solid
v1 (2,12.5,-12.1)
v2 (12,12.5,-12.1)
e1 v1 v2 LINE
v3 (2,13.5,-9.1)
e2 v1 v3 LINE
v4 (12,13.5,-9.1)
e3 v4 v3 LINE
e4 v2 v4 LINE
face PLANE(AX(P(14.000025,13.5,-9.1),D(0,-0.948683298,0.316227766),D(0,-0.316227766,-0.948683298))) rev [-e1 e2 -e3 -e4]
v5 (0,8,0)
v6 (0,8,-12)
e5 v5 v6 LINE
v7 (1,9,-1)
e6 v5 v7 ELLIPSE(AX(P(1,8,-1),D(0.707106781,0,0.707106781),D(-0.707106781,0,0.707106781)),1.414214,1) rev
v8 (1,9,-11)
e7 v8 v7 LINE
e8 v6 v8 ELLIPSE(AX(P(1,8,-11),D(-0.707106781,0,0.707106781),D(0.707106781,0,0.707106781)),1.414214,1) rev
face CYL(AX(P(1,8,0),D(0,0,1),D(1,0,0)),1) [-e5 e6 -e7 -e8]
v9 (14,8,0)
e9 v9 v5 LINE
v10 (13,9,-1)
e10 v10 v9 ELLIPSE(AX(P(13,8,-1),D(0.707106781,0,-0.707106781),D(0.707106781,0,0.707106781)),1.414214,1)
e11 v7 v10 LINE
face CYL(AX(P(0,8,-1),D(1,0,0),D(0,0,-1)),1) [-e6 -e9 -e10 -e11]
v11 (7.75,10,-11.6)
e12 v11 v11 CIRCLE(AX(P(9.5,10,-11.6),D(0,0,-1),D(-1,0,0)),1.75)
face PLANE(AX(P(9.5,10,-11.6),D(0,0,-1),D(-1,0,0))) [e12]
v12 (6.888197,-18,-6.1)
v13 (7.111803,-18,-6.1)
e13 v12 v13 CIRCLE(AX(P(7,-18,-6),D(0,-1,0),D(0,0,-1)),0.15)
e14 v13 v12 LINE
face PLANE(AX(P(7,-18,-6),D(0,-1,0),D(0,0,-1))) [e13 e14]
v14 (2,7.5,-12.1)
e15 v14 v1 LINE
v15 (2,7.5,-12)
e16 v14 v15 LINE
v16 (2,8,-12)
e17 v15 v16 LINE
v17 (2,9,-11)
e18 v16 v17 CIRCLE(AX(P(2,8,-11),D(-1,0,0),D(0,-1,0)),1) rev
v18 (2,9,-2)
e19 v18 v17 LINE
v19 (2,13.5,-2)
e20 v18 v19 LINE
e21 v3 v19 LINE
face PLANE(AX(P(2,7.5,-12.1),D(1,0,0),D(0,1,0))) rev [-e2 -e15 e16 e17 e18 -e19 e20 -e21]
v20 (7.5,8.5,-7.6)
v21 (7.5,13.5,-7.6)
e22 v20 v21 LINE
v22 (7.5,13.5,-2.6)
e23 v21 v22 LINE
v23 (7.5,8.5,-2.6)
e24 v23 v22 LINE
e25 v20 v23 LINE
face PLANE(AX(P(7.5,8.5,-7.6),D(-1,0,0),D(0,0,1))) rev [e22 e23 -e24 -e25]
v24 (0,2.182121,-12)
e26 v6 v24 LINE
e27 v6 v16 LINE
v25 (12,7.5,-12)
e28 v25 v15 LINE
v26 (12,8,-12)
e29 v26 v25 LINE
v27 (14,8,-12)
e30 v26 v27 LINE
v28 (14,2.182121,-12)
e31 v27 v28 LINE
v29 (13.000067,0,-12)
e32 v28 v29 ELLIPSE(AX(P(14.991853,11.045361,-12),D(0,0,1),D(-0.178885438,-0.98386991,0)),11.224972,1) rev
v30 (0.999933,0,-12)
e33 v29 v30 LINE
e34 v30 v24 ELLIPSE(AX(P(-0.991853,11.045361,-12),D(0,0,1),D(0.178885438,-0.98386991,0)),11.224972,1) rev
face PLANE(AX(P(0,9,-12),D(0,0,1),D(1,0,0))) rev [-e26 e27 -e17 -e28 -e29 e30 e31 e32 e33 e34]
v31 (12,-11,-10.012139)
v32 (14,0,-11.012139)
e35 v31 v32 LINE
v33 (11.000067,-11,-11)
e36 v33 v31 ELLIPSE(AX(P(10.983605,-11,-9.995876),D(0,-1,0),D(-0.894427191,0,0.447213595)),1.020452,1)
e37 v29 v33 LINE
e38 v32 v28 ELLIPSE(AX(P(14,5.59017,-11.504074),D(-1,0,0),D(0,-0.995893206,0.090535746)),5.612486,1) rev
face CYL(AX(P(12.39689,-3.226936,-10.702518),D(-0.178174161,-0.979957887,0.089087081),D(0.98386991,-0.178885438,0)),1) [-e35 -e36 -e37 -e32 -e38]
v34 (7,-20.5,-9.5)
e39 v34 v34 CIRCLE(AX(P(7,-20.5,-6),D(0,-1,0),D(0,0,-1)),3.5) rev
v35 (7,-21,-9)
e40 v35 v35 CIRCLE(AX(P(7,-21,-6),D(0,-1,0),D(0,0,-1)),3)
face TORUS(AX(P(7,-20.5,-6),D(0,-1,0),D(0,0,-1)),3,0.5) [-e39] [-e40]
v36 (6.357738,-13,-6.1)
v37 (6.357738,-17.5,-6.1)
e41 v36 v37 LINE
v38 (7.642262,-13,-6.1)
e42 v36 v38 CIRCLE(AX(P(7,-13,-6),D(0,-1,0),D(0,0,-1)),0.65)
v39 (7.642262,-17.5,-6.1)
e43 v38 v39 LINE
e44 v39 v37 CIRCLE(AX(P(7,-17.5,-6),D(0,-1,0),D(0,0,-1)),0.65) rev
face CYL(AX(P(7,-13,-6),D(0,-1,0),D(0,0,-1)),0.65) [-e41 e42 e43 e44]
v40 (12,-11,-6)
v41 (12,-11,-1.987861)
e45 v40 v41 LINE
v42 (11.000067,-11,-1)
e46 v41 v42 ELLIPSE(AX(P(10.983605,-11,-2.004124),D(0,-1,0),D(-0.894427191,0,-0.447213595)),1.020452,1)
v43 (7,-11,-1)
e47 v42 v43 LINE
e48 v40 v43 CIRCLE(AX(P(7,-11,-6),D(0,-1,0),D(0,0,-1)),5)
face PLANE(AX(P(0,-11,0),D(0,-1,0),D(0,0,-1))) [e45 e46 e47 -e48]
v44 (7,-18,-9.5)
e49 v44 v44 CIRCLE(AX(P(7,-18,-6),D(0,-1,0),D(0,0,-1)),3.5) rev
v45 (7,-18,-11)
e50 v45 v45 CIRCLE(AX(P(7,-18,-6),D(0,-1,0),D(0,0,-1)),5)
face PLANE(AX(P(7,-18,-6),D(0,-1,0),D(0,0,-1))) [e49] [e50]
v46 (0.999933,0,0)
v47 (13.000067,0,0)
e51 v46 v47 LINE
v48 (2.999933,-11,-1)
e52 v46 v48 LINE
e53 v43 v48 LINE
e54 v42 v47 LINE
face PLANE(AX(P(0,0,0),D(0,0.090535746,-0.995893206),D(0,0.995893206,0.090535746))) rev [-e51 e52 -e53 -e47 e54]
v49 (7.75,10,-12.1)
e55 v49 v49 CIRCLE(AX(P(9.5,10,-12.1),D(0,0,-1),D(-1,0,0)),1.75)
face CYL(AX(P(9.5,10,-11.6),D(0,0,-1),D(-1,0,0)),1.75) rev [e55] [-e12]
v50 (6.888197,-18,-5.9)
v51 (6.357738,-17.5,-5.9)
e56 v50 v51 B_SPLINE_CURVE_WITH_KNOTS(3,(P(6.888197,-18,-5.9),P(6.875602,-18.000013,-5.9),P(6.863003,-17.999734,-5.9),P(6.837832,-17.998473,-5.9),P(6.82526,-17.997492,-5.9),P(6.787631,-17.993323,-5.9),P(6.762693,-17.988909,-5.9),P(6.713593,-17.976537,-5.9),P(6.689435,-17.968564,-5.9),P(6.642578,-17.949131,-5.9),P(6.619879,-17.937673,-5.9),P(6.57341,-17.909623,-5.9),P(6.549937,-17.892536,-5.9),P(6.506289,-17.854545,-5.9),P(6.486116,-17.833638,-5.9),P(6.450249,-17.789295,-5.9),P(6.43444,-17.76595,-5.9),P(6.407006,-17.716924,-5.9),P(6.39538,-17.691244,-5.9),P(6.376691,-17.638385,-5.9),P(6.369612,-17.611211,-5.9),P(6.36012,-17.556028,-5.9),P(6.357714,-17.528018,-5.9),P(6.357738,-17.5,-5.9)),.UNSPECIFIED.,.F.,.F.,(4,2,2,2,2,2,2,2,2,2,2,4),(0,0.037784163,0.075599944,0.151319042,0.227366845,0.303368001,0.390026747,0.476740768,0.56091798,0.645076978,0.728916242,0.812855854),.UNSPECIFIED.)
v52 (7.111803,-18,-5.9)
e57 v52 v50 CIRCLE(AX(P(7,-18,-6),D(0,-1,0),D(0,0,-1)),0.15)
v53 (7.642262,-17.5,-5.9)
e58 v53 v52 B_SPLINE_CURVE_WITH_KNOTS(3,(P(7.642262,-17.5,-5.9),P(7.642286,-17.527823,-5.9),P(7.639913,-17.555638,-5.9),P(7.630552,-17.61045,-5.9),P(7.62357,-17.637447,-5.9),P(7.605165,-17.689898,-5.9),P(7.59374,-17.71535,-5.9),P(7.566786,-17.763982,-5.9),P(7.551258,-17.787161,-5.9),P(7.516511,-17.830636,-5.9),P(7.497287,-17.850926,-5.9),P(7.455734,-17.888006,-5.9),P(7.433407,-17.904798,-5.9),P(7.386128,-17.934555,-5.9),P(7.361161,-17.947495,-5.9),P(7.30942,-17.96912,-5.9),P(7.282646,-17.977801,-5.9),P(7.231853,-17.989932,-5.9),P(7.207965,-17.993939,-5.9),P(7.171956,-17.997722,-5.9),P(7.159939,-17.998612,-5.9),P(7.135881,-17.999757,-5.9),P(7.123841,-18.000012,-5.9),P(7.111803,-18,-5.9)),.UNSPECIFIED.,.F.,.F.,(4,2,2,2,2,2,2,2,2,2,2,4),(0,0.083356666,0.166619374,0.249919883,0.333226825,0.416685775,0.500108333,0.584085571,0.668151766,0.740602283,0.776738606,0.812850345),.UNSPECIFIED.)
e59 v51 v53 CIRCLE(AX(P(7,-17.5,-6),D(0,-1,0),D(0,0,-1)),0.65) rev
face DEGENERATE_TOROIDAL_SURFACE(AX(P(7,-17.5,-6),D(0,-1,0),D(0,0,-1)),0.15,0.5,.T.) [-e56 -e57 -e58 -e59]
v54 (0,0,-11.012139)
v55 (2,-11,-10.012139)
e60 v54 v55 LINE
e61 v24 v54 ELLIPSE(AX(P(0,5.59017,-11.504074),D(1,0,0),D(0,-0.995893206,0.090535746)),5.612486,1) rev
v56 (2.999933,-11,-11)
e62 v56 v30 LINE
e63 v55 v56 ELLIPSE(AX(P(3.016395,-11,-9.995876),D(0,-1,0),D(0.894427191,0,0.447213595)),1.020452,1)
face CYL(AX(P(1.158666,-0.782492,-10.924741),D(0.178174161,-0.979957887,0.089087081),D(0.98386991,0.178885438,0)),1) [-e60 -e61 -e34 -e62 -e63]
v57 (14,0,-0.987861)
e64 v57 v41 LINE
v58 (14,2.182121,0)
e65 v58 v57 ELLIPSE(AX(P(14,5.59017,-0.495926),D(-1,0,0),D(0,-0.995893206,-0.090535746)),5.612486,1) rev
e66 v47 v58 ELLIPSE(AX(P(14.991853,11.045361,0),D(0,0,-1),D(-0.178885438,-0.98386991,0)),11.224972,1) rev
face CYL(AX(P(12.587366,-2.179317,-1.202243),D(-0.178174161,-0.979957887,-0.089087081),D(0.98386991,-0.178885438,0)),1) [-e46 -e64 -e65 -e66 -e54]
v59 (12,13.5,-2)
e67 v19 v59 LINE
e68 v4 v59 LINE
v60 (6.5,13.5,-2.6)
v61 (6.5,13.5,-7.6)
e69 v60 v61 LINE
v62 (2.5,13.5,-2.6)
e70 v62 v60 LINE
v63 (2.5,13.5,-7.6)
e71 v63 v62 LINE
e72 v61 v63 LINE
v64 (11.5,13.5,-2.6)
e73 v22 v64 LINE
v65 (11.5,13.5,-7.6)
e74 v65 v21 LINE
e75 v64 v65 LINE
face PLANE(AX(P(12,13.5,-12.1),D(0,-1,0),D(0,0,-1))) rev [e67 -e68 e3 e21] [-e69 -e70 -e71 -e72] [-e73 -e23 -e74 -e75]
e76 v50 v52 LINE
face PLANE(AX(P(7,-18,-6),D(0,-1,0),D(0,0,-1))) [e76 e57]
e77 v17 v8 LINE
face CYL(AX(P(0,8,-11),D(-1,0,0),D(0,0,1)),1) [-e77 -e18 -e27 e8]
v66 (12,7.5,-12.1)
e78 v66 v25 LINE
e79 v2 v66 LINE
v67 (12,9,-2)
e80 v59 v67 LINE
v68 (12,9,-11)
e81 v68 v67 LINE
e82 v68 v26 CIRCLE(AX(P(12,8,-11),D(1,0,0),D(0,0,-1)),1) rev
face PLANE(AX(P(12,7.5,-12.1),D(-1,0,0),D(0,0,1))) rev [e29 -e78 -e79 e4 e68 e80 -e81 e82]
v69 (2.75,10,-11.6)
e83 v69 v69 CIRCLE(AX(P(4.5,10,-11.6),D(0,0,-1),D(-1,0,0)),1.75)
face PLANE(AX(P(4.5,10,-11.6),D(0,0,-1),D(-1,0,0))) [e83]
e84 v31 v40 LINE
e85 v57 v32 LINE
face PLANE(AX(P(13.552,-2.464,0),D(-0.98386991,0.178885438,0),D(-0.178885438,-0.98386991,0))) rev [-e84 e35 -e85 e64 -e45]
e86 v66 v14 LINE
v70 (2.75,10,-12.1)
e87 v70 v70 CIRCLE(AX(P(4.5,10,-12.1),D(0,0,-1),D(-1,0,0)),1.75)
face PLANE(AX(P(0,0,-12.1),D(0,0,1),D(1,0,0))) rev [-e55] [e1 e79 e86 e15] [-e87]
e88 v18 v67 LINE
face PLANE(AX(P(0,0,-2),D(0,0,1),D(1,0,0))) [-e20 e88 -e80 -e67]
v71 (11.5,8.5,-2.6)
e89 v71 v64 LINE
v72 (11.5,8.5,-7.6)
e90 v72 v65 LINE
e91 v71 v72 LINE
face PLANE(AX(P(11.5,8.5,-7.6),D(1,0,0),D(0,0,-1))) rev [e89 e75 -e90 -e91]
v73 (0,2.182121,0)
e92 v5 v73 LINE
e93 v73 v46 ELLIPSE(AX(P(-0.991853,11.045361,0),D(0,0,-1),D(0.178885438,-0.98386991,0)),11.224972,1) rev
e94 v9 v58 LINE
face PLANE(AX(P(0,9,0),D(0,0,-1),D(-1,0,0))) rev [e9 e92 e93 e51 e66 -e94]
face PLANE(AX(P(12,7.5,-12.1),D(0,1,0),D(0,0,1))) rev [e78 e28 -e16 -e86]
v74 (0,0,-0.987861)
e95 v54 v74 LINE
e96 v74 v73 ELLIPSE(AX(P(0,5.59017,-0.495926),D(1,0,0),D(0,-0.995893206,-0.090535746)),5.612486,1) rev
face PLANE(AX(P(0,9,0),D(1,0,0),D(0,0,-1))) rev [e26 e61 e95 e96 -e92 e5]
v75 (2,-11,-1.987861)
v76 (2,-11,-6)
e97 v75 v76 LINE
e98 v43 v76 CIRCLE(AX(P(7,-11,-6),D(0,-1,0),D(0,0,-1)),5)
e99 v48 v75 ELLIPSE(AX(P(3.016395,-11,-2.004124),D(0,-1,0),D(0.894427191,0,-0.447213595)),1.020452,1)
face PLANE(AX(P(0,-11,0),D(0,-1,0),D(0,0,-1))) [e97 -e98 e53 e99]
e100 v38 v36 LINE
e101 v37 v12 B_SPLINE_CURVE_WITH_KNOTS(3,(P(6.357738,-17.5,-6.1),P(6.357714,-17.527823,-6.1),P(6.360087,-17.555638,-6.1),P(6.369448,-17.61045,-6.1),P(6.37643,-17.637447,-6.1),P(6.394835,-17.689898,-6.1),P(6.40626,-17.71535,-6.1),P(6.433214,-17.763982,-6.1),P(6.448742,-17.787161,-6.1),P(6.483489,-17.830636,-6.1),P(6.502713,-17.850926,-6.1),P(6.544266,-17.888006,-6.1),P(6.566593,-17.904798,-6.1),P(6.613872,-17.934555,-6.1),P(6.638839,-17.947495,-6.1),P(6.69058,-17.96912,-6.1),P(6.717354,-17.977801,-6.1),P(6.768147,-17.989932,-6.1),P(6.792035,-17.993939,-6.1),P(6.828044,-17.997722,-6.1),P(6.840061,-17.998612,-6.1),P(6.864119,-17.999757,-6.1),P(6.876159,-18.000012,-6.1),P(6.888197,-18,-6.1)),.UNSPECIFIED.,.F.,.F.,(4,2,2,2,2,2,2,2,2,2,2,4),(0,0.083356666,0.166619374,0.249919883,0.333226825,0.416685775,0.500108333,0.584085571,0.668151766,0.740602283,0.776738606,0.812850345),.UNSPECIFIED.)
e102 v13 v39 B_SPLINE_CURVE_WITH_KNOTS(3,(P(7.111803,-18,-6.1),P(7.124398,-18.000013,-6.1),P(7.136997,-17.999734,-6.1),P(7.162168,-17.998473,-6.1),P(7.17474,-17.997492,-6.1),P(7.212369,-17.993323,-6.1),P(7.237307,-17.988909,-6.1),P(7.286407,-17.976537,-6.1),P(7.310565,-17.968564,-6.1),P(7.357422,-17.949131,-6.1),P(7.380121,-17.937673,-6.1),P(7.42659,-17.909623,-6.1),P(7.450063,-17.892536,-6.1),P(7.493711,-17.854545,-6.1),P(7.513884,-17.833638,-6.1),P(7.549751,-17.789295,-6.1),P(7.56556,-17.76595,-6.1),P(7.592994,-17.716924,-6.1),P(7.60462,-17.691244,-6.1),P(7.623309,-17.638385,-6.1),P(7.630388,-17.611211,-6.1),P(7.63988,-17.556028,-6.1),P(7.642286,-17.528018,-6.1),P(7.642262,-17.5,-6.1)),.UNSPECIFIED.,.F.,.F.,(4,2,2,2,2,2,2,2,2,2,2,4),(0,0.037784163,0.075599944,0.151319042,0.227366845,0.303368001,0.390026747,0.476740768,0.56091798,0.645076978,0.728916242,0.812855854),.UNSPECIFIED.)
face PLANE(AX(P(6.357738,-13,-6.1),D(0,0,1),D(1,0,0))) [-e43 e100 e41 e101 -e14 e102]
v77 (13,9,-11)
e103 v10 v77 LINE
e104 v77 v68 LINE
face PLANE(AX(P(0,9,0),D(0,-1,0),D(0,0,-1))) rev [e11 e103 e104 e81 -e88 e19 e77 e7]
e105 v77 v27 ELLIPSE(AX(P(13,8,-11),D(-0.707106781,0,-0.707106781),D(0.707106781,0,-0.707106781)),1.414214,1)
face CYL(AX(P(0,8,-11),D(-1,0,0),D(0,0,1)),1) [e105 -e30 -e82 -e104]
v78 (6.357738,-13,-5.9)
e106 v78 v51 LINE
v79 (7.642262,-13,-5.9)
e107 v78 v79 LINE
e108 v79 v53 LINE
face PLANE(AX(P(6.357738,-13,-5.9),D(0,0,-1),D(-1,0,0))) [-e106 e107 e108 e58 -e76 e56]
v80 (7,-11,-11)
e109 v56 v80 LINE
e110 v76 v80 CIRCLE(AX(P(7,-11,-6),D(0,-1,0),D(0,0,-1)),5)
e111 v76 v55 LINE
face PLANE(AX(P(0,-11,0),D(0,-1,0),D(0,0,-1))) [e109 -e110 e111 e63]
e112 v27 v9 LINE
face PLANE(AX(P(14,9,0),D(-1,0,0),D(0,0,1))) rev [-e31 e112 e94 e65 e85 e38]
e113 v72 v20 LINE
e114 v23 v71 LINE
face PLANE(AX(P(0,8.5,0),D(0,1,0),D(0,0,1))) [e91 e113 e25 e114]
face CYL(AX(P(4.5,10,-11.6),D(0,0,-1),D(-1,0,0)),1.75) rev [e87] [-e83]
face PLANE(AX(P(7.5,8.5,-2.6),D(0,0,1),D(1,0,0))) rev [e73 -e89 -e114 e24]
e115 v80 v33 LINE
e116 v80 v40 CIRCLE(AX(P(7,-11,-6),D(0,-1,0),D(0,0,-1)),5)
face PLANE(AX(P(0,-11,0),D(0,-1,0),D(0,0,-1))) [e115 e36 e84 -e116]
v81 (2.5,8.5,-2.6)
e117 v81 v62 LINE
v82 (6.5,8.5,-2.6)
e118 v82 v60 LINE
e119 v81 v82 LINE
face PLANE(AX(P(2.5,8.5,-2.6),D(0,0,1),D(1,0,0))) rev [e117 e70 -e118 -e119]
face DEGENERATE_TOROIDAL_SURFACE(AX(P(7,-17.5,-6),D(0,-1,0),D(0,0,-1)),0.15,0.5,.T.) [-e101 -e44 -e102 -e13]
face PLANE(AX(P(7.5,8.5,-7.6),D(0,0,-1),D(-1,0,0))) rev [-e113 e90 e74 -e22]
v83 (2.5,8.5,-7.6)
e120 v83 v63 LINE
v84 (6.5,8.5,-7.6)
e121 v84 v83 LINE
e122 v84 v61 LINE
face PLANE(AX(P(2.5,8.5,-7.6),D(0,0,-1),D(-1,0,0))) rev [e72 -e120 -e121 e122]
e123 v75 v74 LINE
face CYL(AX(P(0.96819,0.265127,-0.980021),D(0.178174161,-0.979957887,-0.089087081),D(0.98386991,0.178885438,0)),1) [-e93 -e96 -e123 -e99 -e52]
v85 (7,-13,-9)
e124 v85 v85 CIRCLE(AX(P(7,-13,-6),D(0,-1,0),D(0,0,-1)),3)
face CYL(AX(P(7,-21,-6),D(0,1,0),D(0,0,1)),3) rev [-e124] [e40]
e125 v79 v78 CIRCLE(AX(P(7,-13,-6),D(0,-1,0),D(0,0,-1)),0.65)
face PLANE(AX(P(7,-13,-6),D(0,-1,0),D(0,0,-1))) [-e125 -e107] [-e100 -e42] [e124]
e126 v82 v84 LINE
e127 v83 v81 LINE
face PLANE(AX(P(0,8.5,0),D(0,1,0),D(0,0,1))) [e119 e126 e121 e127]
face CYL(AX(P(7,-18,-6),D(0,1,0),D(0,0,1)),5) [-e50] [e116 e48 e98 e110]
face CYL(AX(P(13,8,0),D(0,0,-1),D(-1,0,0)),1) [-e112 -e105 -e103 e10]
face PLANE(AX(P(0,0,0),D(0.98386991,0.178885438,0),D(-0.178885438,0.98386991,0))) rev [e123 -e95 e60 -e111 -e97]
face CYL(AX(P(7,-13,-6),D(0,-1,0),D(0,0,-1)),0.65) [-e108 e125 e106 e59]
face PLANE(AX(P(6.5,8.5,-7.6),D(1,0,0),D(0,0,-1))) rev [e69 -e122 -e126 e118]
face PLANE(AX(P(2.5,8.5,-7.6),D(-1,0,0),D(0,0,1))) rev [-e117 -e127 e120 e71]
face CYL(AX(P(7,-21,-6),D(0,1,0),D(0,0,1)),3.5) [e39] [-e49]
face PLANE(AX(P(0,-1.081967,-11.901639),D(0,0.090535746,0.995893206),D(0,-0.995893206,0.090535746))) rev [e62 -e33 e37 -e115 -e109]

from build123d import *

# Parameters (mm, degrees)
SKETCH_1_W          = 14
SKETCH_1_H          = 12
EXTRUDE_1_DEPTH     = 9
FILLET_2_R          = 1
FILLET_3_R          = 1
SKETCH_8_W          = 10
SKETCH_8_H          = 5.607572988
CUT_EXTRUDE_2_DEPTH = 10
SKETCH_9_W          = 10
SKETCH_9_H          = 6
EXTRUDE_3_DEPTH     = 10.1
SKETCH_10_R         = 1.75
CUT_EXTRUDE_3_DEPTH = 0.5
CUT_EXTRUDE_4_DEPTH = 22.740745157
SKETCH_12_W         = 4
SKETCH_12_H         = 5
CUT_EXTRUDE_5_DEPTH = 5
EXTRUDE_5_DEPTH     = 3
SKETCH_17_R         = 5
EXTRUDE_6_DEPTH     = 7
SKETCH_14_R         = 3.5
SKETCH_14_R_2       = 3
EXTRUDE_7_DEPTH     = 10
FILLET_5_R          = 0.5
CUT_EXTRUDE_START   = -5
SKETCH_18_R         = 3
CUT_EXTRUDE_7_DEPTH = 5
FILLET_6_R          = 0.5


# Some blends are built 0.0001 mm under size
with BuildPart() as part:
    # 草图1 → 凸台-拉伸1 (new body)
    with BuildSketch(Plane(origin=(0, 0, 0), x_dir=(1, 0, 0), z_dir=(0, 1, 0))):
        with Locations((7, 6)):
            Rectangle(SKETCH_1_W, SKETCH_1_H)
    extrude(amount=EXTRUDE_1_DEPTH)

    # 圆角2
    fillet_2_edges = [part.edges().sort_by_distance(p)[0] for p in [
        (14, 9, -6),
        (7, 9, -12),
        (0, 9, -6),
        (7, 9, 0),
    ]]
    fillet(fillet_2_edges, radius=FILLET_2_R)

    # 草图4 → 放样1 section 0
    with BuildSketch(Plane.XZ):
        with BuildLine():
            Line((0, 0), (14, 0))
            Line((14, 0), (14, -12))
            Line((14, -12), (0, -12))
            Line((0, -12), (0, 0))
        make_face()
    # 草图5 → 放样1 section 1
    with BuildSketch(Plane(origin=(0, -11, 0), x_dir=(-1, 0, 0), z_dir=(0, -1, 0))):
        with BuildLine():
            Line((-2, 1), (-12, 1))
            Line((-12, 1), (-12, 11))
            Line((-12, 11), (-2, 11))
            Line((-2, 11), (-2, 1))
        make_face()
    loft()

    # 圆角3
    # the kernel refuses this fillet: 1 mm, written as the material it takes off along each edge
    with BuildSketch(Plane(origin=(14.438278825, 2.410533539, -12.219139413), x_dir=(0.015936381457793344, 0.08765009801785527, 0.9960238411119947), z_dir=(-0.1781741612749496, -0.9799578870122228, 0.0890870806374748)), Plane(origin=(14.438278825, 2.410533539, 0.219139413), x_dir=(-0.9839989676081822, 0.17744243678180333, 0.016131130616527562), z_dir=(-0.1781741612749496, -0.9799578870122228, -0.08908708063747467))) as fillet_3_piece_1:
        with BuildLine():
            CenterArc((FILLET_3_R * 0.983933522321, FILLET_3_R), FILLET_3_R, 180.927975892, 89.072024108)
            Line((-FILLET_3_R * 0.0159353215369, FILLET_3_R * 0.983804473396), (0, 0))
            Line((0, 0), (FILLET_3_R * 0.983933522321, 0))
        make_face()
    extrude(amount=16.144639772, mode=Mode.SUBTRACT)
    with BuildSketch(Plane(origin=(-0.438278825, 2.410533539, -12.219139413), x_dir=(-0.015936381457791863, 0.08765009801785537, 0.9960238411119947), z_dir=(0.1781741612749496, -0.9799578870122228, 0.08908708063747463)), Plane(origin=(-0.438278825, 2.410533539, 0.219139413), x_dir=(0.9839989676081822, 0.17744243678180333, 0.016131130616527607), z_dir=(0.1781741612749496, -0.9799578870122228, -0.0890870806374748))) as fillet_3_piece_2:
        with BuildLine():
            CenterArc((FILLET_3_R * 0.983933522321, -FILLET_3_R), FILLET_3_R, 90, 89.072024108)
            Line((-FILLET_3_R * 0.0159353215369, -FILLET_3_R * 0.983804473396), (0, 0))
            Line((0, 0), (FILLET_3_R * 0.983933522321, 0))
        make_face()
    extrude(amount=16.144639772, mode=Mode.SUBTRACT)

    # 草图8 → 切除-拉伸2 (cut)
    with BuildSketch(Plane(origin=(0, 0, -12), x_dir=(-1, 0, 0), z_dir=(0, 0, -1))):
        with Locations((-7, 10.303786494)):
            Rectangle(SKETCH_8_W, SKETCH_8_H)
    extrude(amount=-CUT_EXTRUDE_2_DEPTH, mode=Mode.SUBTRACT)

    # 草图9 → 凸台-拉伸3 (add)
    with BuildSketch(Plane(origin=(0, 0, -2), x_dir=(-1, 0, 0), z_dir=(0, 0, -1))):
        with Locations((-7, 10.5)):
            Rectangle(SKETCH_9_W, SKETCH_9_H)
    extrude(amount=EXTRUDE_3_DEPTH)

    # 草图10 → 切除-拉伸3 (cut)
    with BuildSketch(Plane(origin=(0, 0, -12.1), x_dir=(-1, 0, 0), z_dir=(0, 0, -1))):
        with Locations((-4.5, 10)):
            Circle(SKETCH_10_R)
        with Locations((-9.5, 10)):
            Circle(SKETCH_10_R)
    extrude(amount=-CUT_EXTRUDE_3_DEPTH, mode=Mode.SUBTRACT)

    # 草图11 → 切除-拉伸4 (cut, through all)
    with BuildSketch(Plane.ZY.offset(-2)):
        Polygon((-12.1, 12.5), (-12.1, 13.5), (-9.1, 13.5), align=None)
    extrude(amount=-CUT_EXTRUDE_4_DEPTH, mode=Mode.SUBTRACT)

    # 草图12 → 切除-拉伸5 (cut)
    with BuildSketch(Plane(origin=(0, 13.5, 0), x_dir=(1, 0, 0), z_dir=(0, 1, 0))):
        with Locations((4.5, 5.1)):
            Rectangle(SKETCH_12_W, SKETCH_12_H)
        with Locations((9.5, 5.1)):
            Rectangle(SKETCH_12_W, SKETCH_12_H)
    extrude(amount=-CUT_EXTRUDE_5_DEPTH, mode=Mode.SUBTRACT)

    # 草图15 → 凸台-拉伸5 (add)
    with BuildSketch(Plane.XZ.offset(11)):
        with BuildLine():
            Line((6.95, -5.251668523), (6.95, -6.748331477))
            ThreePointArc((6.95, -6.748331477), (6.25, -6), (6.95, -5.251668523))
        make_face()
        with BuildLine():
            Line((7.05, -5.251668523), (7.05, -6.748331477))
            ThreePointArc((7.05, -6.748331477), (7.75, -6), (7.05, -5.251668523))
        make_face()
    extrude(amount=EXTRUDE_5_DEPTH)

    # 草图17 → 凸台-拉伸6 (add)
    with BuildSketch(Plane.XZ.offset(11)):
        with Locations(Location((7, -6, 0), (0, 0, 270))):
            Circle(SKETCH_17_R)
    extrude(amount=EXTRUDE_6_DEPTH)

    # 草图14 → 凸台-拉伸7 (add)
    with BuildSketch(Plane.XZ.offset(11)):
        with Locations(Location((7, -6, 0), (0, 0, 270))):
            Circle(SKETCH_14_R)
        with Locations(Location((7, -6, 0), (0, 0, 270))):
            Circle(SKETCH_14_R_2, mode=Mode.SUBTRACT)
    extrude(amount=EXTRUDE_7_DEPTH)

    # 圆角5
    fillet_5_edges = [part.edges().sort_by_distance(p)[0] for p in [
        (7, -21, -2.5),
    ]]
    fillet(fillet_5_edges, radius=FILLET_5_R - 0.0001)  # a hair under: the kernel refuses the full size

    # 草图18 → 切除-拉伸7 (cut)
    with BuildSketch(Plane.XZ.offset(18).offset(CUT_EXTRUDE_START)):
        with Locations(Location((7, -6, 0), (0, 0, 270))):
            Circle(SKETCH_18_R)
        with BuildLine():
            Line((6.357738371, -5.9), (7.642261629, -5.9))
            ThreePointArc((7.642261629, -5.9), (7, -5.35), (6.357738371, -5.9))
        make_face(mode=Mode.SUBTRACT)
        with BuildLine():
            Line((6.357738371, -6.1), (7.642261629, -6.1))
            ThreePointArc((7.642261629, -6.1), (7, -6.65), (6.357738371, -6.1))
        make_face(mode=Mode.SUBTRACT)
    extrude(amount=CUT_EXTRUDE_7_DEPTH, mode=Mode.SUBTRACT)

    # 圆角6
    fillet_6_edges = [part.edges().sort_by_distance(p)[0] for p in [
        (7, -18, -5.35),
        (7, -18, -6.65),
    ]]
    fillet(fillet_6_edges, radius=FILLET_6_R)


solid = part.part
